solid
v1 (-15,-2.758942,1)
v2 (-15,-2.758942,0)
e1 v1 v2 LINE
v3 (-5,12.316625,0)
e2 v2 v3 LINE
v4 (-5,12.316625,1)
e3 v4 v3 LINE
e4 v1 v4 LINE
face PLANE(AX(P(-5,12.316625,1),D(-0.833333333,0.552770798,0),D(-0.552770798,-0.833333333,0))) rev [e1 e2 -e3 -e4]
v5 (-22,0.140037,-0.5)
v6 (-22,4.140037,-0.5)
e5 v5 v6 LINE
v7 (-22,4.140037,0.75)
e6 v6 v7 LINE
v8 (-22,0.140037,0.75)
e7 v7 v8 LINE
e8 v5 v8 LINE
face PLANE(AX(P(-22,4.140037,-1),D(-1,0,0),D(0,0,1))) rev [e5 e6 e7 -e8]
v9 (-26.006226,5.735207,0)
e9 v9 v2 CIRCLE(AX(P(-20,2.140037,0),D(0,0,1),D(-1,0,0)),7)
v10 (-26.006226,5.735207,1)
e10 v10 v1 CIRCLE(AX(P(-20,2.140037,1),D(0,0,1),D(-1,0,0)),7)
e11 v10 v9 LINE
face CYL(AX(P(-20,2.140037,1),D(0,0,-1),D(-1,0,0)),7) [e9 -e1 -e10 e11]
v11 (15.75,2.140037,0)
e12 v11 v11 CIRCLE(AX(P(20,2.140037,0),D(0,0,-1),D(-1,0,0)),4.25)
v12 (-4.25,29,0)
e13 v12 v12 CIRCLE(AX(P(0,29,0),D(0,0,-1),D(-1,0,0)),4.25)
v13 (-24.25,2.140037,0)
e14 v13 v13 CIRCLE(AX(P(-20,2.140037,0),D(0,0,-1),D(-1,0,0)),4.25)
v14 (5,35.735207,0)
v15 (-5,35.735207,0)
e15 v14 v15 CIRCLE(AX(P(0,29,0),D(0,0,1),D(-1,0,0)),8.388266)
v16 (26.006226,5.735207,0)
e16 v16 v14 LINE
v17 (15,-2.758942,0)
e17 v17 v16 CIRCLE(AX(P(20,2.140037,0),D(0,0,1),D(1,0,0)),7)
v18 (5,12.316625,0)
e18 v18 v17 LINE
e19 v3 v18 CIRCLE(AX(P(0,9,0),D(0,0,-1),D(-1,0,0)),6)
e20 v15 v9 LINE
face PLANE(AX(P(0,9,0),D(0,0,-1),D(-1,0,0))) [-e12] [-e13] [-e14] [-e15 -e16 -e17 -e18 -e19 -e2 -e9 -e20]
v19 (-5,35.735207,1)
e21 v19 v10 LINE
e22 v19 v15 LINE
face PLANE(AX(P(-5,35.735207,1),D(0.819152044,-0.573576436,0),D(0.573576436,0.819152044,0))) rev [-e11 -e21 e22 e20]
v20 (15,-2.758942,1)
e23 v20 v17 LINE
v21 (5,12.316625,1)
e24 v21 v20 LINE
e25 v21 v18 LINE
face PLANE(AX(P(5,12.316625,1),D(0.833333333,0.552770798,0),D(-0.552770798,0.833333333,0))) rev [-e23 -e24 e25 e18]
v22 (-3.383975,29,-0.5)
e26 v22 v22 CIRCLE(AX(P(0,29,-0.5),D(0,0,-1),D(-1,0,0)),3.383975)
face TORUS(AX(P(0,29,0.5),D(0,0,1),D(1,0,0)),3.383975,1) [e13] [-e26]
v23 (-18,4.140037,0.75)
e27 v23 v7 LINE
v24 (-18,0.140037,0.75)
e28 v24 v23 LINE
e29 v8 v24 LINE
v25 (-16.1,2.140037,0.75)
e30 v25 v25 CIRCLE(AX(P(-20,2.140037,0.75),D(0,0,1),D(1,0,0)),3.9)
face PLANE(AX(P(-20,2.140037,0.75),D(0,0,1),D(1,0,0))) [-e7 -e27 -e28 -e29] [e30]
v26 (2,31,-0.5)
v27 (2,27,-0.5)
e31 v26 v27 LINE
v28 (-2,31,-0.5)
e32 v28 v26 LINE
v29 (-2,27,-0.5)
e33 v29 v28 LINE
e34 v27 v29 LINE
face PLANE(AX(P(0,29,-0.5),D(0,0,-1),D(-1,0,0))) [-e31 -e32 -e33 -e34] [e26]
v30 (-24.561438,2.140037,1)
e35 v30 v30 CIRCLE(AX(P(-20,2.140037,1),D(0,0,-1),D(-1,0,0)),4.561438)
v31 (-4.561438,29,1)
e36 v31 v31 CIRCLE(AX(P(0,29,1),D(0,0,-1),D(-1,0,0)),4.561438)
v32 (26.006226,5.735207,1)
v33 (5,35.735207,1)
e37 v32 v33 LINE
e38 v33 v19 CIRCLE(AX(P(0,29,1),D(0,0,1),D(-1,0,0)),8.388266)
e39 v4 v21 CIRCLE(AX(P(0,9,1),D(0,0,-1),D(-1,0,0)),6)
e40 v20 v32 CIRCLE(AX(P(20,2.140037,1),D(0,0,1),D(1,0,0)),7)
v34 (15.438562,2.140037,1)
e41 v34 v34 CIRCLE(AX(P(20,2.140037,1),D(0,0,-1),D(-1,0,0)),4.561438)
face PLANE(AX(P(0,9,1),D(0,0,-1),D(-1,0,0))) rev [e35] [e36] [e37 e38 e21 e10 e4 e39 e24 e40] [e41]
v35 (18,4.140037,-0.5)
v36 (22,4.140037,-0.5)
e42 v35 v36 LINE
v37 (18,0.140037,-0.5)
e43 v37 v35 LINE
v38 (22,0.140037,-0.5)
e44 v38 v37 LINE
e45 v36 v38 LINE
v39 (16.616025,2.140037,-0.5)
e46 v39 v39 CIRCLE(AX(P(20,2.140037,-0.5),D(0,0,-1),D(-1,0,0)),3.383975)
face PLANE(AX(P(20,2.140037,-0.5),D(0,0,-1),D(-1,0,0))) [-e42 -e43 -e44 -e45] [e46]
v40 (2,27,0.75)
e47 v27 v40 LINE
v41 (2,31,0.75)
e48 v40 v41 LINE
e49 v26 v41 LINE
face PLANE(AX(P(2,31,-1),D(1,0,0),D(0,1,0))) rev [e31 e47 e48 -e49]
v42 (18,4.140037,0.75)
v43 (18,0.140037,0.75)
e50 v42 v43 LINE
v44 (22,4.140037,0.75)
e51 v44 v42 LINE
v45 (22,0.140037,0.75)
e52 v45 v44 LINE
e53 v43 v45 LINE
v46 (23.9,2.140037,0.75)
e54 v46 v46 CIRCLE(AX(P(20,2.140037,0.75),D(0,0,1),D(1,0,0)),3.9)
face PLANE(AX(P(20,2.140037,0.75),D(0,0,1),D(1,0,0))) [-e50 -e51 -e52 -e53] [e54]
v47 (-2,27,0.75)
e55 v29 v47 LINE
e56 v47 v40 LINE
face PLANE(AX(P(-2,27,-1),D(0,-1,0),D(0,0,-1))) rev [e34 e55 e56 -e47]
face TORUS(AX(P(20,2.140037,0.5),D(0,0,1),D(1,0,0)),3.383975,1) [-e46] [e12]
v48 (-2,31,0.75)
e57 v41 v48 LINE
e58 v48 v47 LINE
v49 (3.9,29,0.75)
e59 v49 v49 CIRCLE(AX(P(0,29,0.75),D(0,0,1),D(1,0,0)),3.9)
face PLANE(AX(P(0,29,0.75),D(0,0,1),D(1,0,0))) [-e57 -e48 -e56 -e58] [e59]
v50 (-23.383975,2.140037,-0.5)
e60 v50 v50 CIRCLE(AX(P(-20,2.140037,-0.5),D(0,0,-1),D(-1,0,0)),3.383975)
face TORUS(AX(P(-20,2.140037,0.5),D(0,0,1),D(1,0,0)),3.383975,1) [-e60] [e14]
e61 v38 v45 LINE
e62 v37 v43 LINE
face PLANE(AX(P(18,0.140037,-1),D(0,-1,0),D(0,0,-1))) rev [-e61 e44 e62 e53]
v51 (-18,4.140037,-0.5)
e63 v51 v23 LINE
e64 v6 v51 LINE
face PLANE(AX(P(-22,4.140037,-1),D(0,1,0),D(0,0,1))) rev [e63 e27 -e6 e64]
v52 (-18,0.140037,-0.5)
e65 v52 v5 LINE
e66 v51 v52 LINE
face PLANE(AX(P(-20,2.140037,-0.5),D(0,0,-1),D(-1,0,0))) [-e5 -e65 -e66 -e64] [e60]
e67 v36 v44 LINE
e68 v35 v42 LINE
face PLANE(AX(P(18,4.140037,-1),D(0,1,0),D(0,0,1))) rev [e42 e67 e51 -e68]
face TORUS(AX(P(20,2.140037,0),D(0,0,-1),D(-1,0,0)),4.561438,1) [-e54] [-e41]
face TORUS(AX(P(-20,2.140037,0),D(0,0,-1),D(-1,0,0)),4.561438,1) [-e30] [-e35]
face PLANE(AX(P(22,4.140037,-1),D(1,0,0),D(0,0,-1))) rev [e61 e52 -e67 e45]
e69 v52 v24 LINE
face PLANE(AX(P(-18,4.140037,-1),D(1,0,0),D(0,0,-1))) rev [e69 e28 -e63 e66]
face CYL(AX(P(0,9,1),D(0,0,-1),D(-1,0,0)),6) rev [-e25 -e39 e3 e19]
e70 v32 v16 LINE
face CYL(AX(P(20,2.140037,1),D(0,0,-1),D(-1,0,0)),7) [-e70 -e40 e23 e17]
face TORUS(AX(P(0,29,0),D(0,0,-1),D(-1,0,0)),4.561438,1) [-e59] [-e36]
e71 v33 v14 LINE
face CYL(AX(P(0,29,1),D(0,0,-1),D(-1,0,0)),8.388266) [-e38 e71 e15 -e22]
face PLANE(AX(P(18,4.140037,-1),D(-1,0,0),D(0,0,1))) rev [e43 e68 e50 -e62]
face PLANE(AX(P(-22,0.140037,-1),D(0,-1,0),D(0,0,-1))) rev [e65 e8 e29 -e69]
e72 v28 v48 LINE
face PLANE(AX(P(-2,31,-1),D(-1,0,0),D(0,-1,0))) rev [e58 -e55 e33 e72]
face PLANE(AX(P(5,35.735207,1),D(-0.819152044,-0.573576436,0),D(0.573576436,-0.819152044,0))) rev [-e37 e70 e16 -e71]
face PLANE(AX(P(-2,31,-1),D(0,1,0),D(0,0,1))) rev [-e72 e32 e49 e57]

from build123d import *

# Parameters (mm, degrees)
BOSS_EXTRUDE2_DEPTH = 1
SKETCH2_R           = 3.9
CUT_EXTRUDE1_DEPTH  = 0.25
FILLET1_R           = 1
SKETCH5_W           = 4
SKETCH5_H           = 4
CUT_EXTRUDE6_DEPTH  = 2
SKETCH6_R           = 4.25
SKETCH6_W           = 4
SKETCH6_H           = 4
BOSS_EXTRUDE3_DEPTH = 0.5
FILLET2_R           = 1


with BuildPart() as part:
    # Sketch1 → Boss-Extrude2 (new body)
    with BuildSketch(Plane.XY):
        with BuildLine():
            Line((-5, 12.31662479), (-15, -2.758942439))
            ThreePointArc((-15, -2.758942439), (-24.276770595, -3.401554175), (-26.006226146, 5.735207068))
            Line((-26.006226146, 5.735207068), (-5, 35.735207068))
            ThreePointArc((-5, 35.735207068), (0, 37.388266463), (5, 35.735207068))
            Line((5, 35.735207068), (26.006226146, 5.735207068))
            ThreePointArc((26.006226146, 5.735207068), (24.276770595, -3.401554175), (15, -2.758942439))
            Line((15, -2.758942439), (5, 12.31662479))
            ThreePointArc((5, 12.31662479), (0, 15), (-5, 12.31662479))
        make_face()
    extrude(amount=BOSS_EXTRUDE2_DEPTH)

    # Sketch2 → Cut-Extrude1 (cut)
    with BuildSketch(Plane.XY.offset(1)):
        with Locations((-20, 2.140037047)):
            Circle(SKETCH2_R)
        with Locations((20, 2.140037047)):
            Circle(SKETCH2_R)
        with Locations((0, 29)):
            Circle(SKETCH2_R)
    extrude(amount=-CUT_EXTRUDE1_DEPTH, mode=Mode.SUBTRACT)

    # Fillet1
    # the kernel refuses this fillet: 1 mm, written as the material it takes off along each edge
    with BuildSketch(Plane(origin=(-20, 2.140037047, 1), x_dir=(1, 0, 0), z_dir=(0, -1, 0))) as fillet1_piece_1:
        with BuildLine():
            CenterArc((4.561437828, -1), FILLET1_R, 90, 41.409622109)
            Line((3.9, -0.25), (3.886771243, -0.235))
            ThreePointArc((3.886771243, -0.235), (3.88, -0.125), (3.88, 0))
            Line((3.88, 0), (3.9, 0.02))
            Line((3.9, 0.02), (4.561437828, 0.02))
            Line((4.561437828, 0.02), (4.561437828, 0))
        make_face()
    revolve(axis=Axis((-20, 2.140037047, 1), (0, 0, 1)), mode=Mode.SUBTRACT)
    with BuildSketch(Plane(origin=(20, 2.140037047, 1), x_dir=(1, 0, 0), z_dir=(0, -1, 0))) as fillet1_piece_2:
        with BuildLine():
            CenterArc((4.561437828, -1), FILLET1_R, 90, 41.409622109)
            Line((3.9, -0.25), (3.886771243, -0.235))
            ThreePointArc((3.886771243, -0.235), (3.88, -0.125), (3.88, 0))
            Line((3.88, 0), (3.9, 0.02))
            Line((3.9, 0.02), (4.561437828, 0.02))
            Line((4.561437828, 0.02), (4.561437828, 0))
        make_face()
    revolve(axis=Axis((20, 2.140037047, 1), (0, 0, 1)), mode=Mode.SUBTRACT)
    with BuildSketch(Plane(origin=(0, 29, 1), x_dir=(1, 0, 0), z_dir=(0, -1, 0))) as fillet1_piece_3:
        with BuildLine():
            CenterArc((4.561437828, -1), FILLET1_R, 90, 41.409622109)
            Line((3.9, -0.25), (3.886771243, -0.235))
            ThreePointArc((3.886771243, -0.235), (3.88, -0.125), (3.88, 0))
            Line((3.88, 0), (3.9, 0.02))
            Line((3.9, 0.02), (4.561437828, 0.02))
            Line((4.561437828, 0.02), (4.561437828, 0))
        make_face()
    revolve(axis=Axis((0, 29, 1), (0, 0, 1)), mode=Mode.SUBTRACT)

    # Sketch5 → Cut-Extrude6 (cut)
    with BuildSketch(Plane.XY.offset(1)):
        with Locations((0, 29)):
            Rectangle(SKETCH5_W, SKETCH5_H)
        with Locations((20, 2.140037047)):
            Rectangle(SKETCH5_W, SKETCH5_H)
        with Locations((-20, 2.140037047)):
            Rectangle(SKETCH5_W, SKETCH5_H)
    extrude(amount=-CUT_EXTRUDE6_DEPTH, mode=Mode.SUBTRACT)

    # Sketch6 → Boss-Extrude3 (add)
    # profile 1 of 3: a face of its own
    with BuildSketch(Plane(origin=(0, 0, 0), x_dir=(-1, 0, 0), z_dir=(0, 0, -1))):
        with Locations((0, 29)):
            Circle(SKETCH6_R)
        with Locations((0, 29)):
            Rectangle(SKETCH6_W, SKETCH6_H, mode=Mode.SUBTRACT)
    # profile 2 of 3: a face of its own
    with BuildSketch(Plane(origin=(0, 0, 0), x_dir=(-1, 0, 0), z_dir=(0, 0, -1))):
        with Locations((-20, 2.140037047)):
            Circle(SKETCH6_R)
        with Locations((-20, 2.140037047)):
            Rectangle(SKETCH6_W, SKETCH6_H, mode=Mode.SUBTRACT)
    # profile 3 of 3: a face of its own
    with BuildSketch(Plane(origin=(0, 0, 0), x_dir=(-1, 0, 0), z_dir=(0, 0, -1))):
        with Locations((20, 2.140037047)):
            Circle(SKETCH6_R)
        with Locations((20, 2.140037047)):
            Rectangle(SKETCH6_W, SKETCH6_H, mode=Mode.SUBTRACT)
    extrude(amount=BOSS_EXTRUDE3_DEPTH)

    # Fillet2
    # the kernel refuses this fillet: 1 mm, written as the material it takes off along each edge
    with BuildSketch(Plane(origin=(0, 29, -0.5), x_dir=(-1, 0, 0), z_dir=(0, -1, 0))) as fillet2_piece_1:
        with BuildLine():
            CenterArc((3.383974596, -1), FILLET2_R, 30, 60)
            Line((4.25, -0.5), (4.267320508, -0.49))
            ThreePointArc((4.267320508, -0.49), (4.27, -0.25), (4.27, 0))
            Line((4.27, 0), (4.25, 0.02))
            Line((4.25, 0.02), (3.383974596, 0.02))
            Line((3.383974596, 0.02), (3.383974596, 0))
        make_face()
    revolve(axis=Axis((0, 29, -0.5), (0, 0, -1)), mode=Mode.SUBTRACT)
    with BuildSketch(Plane(origin=(20, 2.140037047, -0.5), x_dir=(-1, 0, 0), z_dir=(0, -1, 0))) as fillet2_piece_2:
        with BuildLine():
            CenterArc((3.383974596, -1), FILLET2_R, 30, 60)
            Line((4.25, -0.5), (4.267320508, -0.49))
            ThreePointArc((4.267320508, -0.49), (4.27, -0.25), (4.27, 0))
            Line((4.27, 0), (4.25, 0.02))
            Line((4.25, 0.02), (3.383974596, 0.02))
            Line((3.383974596, 0.02), (3.383974596, 0))
        make_face()
    revolve(axis=Axis((20, 2.140037047, -0.5), (0, 0, -1)), mode=Mode.SUBTRACT)
    with BuildSketch(Plane(origin=(-20, 2.140037047, -0.5), x_dir=(-1, 0, 0), z_dir=(0, -1, 0))) as fillet2_piece_3:
        with BuildLine():
            CenterArc((3.383974596, -1), FILLET2_R, 30, 60)
            Line((4.25, -0.5), (4.267320508, -0.49))
            ThreePointArc((4.267320508, -0.49), (4.27, -0.25), (4.27, 0))
            Line((4.27, 0), (4.25, 0.02))
            Line((4.25, 0.02), (3.383974596, 0.02))
            Line((3.383974596, 0.02), (3.383974596, 0))
        make_face()
    revolve(axis=Axis((-20, 2.140037047, -0.5), (0, 0, -1)), mode=Mode.SUBTRACT)


solid = part.part
